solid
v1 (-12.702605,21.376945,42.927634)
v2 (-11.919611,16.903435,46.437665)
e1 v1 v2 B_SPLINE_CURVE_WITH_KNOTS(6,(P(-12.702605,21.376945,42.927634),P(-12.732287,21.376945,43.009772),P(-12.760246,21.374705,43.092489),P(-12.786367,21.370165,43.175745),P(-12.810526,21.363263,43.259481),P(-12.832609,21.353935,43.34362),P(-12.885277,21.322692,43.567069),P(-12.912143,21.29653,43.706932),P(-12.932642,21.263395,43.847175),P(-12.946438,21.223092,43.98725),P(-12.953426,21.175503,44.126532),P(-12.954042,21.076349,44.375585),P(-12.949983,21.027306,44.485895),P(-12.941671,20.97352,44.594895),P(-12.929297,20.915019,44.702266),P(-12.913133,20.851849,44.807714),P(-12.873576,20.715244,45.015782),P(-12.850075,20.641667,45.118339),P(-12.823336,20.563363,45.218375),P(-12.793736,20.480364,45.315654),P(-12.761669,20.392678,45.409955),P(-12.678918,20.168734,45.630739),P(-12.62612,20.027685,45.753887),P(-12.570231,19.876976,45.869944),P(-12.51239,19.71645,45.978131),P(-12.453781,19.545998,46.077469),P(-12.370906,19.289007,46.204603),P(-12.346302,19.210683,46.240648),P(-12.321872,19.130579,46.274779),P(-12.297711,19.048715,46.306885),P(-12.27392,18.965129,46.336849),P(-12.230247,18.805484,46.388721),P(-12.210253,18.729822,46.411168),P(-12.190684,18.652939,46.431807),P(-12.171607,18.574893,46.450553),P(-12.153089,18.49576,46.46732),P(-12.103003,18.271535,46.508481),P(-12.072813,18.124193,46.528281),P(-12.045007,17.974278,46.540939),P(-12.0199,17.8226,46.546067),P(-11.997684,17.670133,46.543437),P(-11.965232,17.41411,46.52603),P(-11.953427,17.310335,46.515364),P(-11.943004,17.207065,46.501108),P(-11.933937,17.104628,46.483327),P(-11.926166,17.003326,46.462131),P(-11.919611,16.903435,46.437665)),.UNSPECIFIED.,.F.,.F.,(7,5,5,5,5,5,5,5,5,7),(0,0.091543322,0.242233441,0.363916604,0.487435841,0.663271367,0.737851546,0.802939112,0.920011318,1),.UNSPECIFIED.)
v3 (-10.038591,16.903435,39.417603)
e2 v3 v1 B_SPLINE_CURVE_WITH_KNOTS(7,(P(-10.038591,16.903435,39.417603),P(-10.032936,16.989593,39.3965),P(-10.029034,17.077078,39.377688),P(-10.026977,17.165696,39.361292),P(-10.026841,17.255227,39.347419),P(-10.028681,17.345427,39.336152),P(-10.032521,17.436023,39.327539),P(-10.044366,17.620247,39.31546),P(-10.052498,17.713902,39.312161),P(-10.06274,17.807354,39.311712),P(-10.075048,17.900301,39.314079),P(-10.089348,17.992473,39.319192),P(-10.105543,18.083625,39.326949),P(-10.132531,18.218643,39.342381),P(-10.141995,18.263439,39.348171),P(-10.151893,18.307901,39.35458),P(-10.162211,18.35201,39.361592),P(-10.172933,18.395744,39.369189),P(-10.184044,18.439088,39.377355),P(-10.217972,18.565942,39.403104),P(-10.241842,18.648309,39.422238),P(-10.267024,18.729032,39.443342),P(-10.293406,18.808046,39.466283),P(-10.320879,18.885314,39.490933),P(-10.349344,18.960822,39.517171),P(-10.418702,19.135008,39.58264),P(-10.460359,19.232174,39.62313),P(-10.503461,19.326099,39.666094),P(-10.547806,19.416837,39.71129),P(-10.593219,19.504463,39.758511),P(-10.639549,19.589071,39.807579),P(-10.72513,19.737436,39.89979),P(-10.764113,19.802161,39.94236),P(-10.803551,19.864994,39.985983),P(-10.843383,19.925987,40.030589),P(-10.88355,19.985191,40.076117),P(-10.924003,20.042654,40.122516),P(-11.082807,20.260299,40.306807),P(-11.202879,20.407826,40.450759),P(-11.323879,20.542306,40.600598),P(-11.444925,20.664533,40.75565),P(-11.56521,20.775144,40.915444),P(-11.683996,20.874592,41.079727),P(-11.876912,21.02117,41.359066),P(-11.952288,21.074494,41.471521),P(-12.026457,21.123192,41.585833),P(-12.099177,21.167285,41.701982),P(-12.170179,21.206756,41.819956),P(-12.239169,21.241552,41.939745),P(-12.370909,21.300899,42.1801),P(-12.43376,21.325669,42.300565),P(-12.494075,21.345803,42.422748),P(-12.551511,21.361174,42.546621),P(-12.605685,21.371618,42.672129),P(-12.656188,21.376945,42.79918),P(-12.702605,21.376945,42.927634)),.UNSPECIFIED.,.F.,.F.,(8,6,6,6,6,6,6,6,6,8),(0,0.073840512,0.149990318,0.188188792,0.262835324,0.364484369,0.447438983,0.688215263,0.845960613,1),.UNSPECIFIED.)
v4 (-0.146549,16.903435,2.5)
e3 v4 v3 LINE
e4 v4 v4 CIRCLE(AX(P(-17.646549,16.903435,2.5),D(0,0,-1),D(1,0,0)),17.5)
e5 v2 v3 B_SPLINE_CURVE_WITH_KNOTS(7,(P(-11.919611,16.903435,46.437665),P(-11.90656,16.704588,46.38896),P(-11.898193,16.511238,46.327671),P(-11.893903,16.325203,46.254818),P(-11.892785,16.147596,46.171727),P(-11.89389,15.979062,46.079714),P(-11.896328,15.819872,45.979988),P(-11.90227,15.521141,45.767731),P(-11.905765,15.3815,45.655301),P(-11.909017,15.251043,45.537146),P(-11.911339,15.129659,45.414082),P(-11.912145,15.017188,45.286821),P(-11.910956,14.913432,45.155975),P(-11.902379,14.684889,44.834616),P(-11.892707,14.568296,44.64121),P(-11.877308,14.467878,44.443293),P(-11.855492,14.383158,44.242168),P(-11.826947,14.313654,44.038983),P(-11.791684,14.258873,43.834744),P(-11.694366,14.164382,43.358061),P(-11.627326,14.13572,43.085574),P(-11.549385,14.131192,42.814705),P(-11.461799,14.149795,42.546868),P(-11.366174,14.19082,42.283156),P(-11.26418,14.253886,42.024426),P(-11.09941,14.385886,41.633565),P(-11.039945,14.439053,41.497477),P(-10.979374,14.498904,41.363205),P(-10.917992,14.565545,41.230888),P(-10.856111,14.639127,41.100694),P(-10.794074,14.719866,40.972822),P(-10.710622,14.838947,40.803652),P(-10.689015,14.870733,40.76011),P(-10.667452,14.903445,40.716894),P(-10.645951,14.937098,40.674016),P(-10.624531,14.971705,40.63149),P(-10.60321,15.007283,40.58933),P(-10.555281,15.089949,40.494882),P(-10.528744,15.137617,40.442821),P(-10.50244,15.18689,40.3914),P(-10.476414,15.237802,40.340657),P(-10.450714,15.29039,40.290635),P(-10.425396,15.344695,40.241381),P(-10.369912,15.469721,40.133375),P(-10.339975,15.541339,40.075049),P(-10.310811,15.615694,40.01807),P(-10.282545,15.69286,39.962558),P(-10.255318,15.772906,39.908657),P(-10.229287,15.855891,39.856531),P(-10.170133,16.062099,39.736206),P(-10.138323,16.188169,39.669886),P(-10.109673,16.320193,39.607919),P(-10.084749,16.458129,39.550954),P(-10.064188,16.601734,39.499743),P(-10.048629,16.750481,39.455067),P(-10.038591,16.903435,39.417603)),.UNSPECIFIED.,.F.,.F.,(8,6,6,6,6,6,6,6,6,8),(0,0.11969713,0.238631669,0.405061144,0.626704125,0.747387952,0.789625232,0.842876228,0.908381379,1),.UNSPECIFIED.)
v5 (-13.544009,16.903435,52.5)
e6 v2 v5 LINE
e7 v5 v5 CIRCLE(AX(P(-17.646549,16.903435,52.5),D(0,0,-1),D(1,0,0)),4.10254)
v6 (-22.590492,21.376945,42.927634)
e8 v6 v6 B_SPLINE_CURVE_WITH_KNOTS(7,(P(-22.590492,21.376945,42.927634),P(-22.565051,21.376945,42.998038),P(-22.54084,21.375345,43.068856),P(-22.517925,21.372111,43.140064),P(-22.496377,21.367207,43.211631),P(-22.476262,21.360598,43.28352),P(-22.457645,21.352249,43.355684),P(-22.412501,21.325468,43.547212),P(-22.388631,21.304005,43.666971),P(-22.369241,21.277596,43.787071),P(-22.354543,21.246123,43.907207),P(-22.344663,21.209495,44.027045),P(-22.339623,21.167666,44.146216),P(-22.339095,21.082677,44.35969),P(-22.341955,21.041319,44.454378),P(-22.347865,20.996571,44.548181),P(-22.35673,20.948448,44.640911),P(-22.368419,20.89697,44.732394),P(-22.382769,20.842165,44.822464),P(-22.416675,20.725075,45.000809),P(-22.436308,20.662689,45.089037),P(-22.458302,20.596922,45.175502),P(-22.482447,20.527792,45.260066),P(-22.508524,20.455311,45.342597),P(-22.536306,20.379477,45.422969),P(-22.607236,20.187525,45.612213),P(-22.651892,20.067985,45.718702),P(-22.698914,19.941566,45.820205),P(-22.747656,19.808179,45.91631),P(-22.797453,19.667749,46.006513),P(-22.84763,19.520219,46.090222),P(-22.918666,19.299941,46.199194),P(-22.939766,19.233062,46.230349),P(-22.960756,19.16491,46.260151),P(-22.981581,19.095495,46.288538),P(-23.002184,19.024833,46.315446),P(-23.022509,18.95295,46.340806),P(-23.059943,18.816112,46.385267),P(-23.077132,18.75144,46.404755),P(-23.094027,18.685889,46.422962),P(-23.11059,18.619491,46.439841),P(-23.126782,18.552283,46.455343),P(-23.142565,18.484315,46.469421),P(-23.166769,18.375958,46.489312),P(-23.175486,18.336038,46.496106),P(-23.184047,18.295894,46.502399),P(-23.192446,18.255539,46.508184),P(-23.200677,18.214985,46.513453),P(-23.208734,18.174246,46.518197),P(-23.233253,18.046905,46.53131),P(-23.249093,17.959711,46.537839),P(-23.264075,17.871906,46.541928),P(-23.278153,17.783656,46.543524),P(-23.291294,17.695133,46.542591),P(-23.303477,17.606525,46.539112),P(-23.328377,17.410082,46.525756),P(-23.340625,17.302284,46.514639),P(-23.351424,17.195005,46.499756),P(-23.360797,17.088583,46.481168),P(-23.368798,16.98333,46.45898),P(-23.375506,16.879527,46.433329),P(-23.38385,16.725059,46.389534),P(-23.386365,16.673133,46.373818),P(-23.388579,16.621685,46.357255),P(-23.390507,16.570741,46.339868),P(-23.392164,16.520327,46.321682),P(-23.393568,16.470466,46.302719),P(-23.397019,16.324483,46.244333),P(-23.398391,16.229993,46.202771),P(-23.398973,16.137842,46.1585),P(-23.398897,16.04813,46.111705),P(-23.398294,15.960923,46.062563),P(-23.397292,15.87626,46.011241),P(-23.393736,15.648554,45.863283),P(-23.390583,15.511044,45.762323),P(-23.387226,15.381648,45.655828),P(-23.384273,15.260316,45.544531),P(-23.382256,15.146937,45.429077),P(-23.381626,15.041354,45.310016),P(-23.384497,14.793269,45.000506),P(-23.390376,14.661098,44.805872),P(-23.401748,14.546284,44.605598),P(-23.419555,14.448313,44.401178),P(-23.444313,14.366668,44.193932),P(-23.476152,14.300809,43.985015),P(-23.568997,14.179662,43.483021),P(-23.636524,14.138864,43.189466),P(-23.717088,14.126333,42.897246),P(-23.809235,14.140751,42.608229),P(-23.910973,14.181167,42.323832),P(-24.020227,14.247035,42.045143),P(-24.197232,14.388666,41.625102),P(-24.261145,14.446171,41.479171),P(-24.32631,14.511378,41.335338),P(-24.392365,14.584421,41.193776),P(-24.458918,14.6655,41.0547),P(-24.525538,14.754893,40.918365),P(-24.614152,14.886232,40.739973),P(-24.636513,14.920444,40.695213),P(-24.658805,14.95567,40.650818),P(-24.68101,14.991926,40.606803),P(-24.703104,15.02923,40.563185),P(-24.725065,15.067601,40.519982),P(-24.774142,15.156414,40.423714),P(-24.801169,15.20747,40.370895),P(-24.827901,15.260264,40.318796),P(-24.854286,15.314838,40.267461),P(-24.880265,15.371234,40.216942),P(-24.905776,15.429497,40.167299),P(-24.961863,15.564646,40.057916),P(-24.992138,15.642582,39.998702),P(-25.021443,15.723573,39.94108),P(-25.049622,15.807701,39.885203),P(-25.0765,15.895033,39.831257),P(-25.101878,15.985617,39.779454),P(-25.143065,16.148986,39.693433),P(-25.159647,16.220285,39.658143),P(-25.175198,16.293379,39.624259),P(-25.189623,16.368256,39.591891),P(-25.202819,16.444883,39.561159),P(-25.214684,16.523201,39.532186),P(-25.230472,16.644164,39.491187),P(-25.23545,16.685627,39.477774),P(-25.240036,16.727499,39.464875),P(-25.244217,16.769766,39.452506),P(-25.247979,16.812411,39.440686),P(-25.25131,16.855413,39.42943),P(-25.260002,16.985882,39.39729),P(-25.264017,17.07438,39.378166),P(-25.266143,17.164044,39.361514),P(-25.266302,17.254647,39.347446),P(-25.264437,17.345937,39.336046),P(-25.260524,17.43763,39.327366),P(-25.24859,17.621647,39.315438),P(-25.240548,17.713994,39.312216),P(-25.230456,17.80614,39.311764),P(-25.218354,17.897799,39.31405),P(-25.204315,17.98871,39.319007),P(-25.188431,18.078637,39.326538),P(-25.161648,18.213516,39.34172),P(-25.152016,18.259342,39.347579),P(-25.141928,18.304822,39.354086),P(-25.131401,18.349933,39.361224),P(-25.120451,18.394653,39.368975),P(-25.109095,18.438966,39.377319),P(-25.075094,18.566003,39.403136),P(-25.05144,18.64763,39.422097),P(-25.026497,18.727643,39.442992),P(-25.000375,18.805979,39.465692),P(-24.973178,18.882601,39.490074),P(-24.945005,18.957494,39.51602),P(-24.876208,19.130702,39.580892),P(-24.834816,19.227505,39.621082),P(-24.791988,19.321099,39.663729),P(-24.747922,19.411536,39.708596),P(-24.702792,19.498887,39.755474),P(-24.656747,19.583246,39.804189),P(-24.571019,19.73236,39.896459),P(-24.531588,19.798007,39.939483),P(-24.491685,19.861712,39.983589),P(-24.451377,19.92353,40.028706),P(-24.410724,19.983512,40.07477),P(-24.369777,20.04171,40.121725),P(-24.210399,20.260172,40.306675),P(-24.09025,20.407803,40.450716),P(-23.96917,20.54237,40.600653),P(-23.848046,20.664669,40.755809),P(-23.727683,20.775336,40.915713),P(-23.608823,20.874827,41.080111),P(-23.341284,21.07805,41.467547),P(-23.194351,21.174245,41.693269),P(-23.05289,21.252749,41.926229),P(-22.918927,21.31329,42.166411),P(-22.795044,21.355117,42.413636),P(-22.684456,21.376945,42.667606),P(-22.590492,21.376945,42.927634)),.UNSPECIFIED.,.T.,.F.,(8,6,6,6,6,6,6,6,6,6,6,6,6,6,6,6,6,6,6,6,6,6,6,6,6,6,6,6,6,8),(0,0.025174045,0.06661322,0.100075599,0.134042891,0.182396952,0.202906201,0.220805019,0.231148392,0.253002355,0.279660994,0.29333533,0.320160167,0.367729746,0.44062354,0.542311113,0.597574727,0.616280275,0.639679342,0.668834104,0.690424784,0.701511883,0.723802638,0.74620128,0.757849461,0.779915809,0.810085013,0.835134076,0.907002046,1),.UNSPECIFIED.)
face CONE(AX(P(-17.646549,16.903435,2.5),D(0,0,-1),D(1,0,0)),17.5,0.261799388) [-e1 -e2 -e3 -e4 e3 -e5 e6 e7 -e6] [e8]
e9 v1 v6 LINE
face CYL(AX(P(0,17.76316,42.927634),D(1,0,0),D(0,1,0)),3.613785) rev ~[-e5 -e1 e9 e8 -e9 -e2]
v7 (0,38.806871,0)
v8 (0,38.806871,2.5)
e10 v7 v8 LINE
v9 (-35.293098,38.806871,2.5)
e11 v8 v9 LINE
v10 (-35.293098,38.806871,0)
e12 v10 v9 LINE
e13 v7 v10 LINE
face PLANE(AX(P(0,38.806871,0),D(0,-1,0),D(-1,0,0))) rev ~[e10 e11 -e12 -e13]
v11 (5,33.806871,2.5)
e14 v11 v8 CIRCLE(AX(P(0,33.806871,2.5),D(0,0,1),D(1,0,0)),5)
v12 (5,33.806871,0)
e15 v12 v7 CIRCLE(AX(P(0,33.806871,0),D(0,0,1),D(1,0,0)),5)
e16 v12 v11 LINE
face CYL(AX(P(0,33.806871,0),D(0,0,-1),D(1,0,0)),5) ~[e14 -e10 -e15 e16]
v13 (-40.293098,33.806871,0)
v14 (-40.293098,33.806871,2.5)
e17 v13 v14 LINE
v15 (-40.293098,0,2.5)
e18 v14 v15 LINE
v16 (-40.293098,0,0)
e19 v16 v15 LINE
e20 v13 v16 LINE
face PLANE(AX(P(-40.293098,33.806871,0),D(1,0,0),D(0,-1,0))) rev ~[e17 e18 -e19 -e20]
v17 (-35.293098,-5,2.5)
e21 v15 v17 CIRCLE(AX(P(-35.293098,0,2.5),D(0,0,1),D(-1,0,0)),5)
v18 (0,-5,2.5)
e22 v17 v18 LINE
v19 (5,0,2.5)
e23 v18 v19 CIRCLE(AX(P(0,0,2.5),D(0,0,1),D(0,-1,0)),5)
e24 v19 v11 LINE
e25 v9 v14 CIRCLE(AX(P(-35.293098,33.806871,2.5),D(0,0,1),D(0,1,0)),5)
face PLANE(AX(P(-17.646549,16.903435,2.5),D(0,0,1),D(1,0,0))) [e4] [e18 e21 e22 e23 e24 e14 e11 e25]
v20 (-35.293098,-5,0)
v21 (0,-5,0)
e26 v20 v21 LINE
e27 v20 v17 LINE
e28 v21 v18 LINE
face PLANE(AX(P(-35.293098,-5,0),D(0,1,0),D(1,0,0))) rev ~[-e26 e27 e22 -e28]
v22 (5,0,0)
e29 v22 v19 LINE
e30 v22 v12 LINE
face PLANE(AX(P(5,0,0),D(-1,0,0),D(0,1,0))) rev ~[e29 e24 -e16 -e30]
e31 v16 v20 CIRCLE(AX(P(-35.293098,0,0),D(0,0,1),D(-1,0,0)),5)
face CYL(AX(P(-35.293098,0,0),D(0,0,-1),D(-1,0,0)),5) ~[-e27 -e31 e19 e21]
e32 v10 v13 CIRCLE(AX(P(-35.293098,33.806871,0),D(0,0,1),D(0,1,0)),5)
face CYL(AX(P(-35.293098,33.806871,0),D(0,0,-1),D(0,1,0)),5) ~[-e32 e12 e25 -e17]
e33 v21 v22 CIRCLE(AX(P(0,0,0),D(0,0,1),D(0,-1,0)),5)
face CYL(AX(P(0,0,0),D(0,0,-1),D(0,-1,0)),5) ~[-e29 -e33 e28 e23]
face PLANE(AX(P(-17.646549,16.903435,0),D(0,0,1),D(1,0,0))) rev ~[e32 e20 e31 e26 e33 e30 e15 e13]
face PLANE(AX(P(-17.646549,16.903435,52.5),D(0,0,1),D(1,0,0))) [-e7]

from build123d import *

# Parameters (mm, degrees)
F0_R     = 17.5
F1_DEPTH = 2.5
F2_R     = 17.5
F3_DEPTH = 50
F3_TAPER = 15
F4_R     = 3.6137849114
F5_DEPTH = 60


with BuildPart() as f1:
    # F0 (on Top) → F1 (new body)
    with BuildSketch(Plane.XY):
        with BuildLine():
            Line((0, 38.8068709316), (-35.2930977718, 38.8068709316))
            ThreePointArc((-35.2930977718, 38.8068709316), (-38.8286316778, 37.3424048375), (-40.2930977718, 33.8068709316))
            Line((-40.2930977718, 33.8068709316), (-40.2930977718, 0))
            ThreePointArc((-40.2930977718, 0), (-38.8286316778, -3.5355339059), (-35.2930977718, -5))
            Line((-35.2930977718, -5), (0, -5))
            ThreePointArc((0, -5), (3.5355339059, -3.5355339059), (5, 0))
            Line((5, 0), (5, 33.8068709316))
            ThreePointArc((5, 33.8068709316), (3.5355339059, 37.3424048375), (0, 38.8068709316))
        make_face()
        with Locations((-17.6465488859, 16.9034354658)):
            Circle(F0_R, mode=Mode.SUBTRACT)
        with Locations((-17.6465488859, 16.9034354658)):
            Circle(F0_R)
    extrude(amount=F1_DEPTH)

    # F2 (on face) → F3 (join)
    with BuildSketch(Plane.XY.offset(2.5)):
        with Locations((-17.6465488859, 16.9034354658)):
            Circle(F2_R)
    extrude(amount=F3_DEPTH, taper=F3_TAPER)

    # F4 (on Right) → F5 (cut)
    with BuildSketch(Plane.YZ):
        with Locations((17.7631601691, 42.927633971)):
            Circle(F4_R)
    extrude(amount=-F5_DEPTH, mode=Mode.SUBTRACT)


solid = f1.part
